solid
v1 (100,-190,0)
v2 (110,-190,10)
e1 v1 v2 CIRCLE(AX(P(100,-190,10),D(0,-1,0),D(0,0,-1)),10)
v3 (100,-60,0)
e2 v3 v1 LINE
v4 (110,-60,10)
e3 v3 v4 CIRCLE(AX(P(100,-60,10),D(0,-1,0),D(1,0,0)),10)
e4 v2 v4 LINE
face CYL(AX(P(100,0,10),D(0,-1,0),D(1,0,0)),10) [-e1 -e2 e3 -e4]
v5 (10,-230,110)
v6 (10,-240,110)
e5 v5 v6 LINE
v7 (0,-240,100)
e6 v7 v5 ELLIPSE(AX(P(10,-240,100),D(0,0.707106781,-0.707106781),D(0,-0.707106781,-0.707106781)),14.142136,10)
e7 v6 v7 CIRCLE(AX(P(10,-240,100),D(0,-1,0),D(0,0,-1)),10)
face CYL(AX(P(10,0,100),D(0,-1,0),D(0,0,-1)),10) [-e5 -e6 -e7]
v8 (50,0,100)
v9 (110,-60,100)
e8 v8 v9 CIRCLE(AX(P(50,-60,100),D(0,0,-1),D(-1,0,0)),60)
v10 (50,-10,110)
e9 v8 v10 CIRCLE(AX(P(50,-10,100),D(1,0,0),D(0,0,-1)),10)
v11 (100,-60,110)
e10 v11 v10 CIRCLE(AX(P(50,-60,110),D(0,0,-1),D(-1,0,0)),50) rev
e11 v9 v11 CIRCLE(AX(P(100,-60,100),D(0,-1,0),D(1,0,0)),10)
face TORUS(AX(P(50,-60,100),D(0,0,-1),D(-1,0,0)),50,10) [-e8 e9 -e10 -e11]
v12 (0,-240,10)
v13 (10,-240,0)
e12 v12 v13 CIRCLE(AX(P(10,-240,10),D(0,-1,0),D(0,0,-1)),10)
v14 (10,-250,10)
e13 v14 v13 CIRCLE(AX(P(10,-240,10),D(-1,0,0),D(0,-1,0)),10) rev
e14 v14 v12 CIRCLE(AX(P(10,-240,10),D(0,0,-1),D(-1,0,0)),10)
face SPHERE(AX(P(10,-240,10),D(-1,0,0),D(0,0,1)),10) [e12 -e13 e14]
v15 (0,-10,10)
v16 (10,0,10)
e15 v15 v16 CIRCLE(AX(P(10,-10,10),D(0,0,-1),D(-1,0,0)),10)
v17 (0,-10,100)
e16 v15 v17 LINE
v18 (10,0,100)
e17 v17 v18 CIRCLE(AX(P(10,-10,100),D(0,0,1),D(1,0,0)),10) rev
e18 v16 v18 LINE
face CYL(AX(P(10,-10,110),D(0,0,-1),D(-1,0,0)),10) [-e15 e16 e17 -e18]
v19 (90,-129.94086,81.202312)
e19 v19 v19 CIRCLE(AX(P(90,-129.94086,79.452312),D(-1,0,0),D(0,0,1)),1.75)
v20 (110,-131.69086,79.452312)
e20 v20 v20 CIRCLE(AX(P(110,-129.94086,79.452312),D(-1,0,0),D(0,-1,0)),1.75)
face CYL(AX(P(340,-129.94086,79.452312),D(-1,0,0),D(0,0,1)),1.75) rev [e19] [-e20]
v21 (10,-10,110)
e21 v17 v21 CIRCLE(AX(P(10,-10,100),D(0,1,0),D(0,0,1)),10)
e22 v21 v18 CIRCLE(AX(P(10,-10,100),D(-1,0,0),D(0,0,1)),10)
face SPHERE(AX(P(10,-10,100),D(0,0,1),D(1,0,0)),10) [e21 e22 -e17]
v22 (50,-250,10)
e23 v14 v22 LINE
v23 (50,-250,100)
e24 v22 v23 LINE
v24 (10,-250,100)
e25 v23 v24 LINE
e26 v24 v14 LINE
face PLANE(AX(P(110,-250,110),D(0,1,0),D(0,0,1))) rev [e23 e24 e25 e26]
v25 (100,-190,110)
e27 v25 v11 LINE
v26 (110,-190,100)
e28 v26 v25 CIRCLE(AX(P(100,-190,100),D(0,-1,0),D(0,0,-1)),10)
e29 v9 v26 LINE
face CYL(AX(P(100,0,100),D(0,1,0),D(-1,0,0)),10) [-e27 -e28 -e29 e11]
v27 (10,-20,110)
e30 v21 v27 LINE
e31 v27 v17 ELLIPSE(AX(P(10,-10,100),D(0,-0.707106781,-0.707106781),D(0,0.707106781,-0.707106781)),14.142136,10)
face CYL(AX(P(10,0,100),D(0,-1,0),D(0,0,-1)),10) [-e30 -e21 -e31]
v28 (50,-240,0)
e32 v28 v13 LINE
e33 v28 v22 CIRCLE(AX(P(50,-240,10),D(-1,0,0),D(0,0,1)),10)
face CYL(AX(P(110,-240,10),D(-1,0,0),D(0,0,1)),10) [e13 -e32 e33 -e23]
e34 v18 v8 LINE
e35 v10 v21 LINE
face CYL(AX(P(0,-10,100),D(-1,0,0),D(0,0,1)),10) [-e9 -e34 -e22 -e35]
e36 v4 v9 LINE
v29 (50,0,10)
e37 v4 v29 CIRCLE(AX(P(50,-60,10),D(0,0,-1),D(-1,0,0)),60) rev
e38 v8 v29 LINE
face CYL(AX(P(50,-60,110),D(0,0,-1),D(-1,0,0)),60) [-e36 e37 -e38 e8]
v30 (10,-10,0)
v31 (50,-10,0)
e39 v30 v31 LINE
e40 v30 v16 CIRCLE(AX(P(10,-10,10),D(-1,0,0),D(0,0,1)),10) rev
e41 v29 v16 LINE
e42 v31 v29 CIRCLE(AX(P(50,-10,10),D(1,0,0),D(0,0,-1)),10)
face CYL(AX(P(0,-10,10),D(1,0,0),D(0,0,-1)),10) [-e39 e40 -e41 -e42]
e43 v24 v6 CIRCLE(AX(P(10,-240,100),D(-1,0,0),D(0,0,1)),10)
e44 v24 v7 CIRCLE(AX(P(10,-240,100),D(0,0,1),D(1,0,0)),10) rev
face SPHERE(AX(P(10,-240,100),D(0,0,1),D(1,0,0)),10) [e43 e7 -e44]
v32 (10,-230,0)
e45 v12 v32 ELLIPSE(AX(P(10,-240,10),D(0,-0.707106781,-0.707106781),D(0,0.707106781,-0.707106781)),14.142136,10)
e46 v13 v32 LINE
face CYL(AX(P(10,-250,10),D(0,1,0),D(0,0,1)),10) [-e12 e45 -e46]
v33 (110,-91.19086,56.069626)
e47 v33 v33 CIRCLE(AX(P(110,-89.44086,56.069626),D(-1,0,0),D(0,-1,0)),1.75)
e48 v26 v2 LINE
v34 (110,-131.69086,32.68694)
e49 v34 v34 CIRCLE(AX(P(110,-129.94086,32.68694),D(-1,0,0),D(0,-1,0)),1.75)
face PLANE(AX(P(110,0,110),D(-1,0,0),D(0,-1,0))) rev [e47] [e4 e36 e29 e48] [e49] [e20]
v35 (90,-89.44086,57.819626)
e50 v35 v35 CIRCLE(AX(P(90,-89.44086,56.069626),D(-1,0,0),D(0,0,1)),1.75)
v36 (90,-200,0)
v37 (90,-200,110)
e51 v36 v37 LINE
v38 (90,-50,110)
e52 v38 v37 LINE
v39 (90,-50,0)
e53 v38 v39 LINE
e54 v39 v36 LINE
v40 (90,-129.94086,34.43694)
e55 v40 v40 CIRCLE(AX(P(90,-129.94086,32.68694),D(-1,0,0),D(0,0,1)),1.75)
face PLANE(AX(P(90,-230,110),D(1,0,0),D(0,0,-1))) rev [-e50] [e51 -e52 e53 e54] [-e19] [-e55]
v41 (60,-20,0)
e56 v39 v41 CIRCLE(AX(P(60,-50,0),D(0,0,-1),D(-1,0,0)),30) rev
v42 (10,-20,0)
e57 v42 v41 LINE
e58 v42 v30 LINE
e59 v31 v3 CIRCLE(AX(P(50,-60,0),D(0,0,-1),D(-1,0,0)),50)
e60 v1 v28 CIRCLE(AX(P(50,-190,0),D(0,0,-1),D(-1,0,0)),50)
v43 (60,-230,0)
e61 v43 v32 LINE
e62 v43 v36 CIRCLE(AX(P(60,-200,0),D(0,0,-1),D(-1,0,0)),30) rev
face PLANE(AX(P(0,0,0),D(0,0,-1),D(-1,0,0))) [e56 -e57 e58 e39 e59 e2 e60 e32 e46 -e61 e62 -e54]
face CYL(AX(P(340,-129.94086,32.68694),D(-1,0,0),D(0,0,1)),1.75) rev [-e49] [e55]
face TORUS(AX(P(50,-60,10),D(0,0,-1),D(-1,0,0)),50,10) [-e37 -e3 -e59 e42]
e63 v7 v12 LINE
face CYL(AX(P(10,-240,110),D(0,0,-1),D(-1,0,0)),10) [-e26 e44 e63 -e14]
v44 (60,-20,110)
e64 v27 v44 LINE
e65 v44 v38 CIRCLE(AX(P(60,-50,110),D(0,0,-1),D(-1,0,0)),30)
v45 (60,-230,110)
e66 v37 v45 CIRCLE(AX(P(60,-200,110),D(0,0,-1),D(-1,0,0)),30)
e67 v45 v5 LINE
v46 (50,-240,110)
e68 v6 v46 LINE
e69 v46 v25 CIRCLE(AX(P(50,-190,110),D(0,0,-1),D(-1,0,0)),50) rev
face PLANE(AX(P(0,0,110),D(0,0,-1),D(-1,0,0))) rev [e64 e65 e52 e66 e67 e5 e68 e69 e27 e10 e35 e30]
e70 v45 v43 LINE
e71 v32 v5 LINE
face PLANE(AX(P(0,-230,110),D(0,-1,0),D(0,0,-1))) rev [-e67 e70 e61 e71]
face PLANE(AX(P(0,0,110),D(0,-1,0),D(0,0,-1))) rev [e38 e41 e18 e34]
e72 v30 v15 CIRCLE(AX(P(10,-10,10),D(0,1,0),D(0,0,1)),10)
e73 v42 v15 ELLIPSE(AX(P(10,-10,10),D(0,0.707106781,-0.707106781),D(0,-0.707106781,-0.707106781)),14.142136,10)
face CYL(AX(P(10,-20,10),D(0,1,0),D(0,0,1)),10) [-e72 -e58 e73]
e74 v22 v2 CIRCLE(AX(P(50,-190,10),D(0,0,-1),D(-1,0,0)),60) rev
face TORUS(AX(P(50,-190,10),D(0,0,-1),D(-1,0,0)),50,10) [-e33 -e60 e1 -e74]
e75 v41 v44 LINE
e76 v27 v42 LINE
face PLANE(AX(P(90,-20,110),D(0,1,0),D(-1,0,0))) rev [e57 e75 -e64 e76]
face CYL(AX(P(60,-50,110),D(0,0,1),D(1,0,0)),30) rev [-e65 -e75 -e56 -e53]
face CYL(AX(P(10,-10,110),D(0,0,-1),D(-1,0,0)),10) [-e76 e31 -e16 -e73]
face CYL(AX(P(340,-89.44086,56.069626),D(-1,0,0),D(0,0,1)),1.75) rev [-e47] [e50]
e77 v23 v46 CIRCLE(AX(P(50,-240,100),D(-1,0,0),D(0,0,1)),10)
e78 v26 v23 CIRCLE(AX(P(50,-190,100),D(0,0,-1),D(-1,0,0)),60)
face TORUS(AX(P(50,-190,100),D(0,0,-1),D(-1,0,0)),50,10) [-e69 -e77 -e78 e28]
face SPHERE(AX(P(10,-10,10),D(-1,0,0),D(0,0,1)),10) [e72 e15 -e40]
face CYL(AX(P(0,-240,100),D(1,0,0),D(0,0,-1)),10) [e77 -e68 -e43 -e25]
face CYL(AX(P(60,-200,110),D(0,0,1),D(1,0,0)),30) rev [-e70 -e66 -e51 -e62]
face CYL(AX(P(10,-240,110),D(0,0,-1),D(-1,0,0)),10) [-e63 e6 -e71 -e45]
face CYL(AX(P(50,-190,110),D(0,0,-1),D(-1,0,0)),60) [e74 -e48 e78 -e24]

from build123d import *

# Parameters (mm, degrees)
BOSS_EXTRUDE1_DEPTH = 110
FILLET1_R           = 60
FILLET3_R           = 30
FILLET4_R           = 10
SKETCH2_R           = 1.75
CUT_EXTRUDE1_DEPTH  = 250


with BuildPart() as part:
    # Sketch1 → Boss-Extrude1 (new body)
    with BuildSketch(Plane.XY):
        Polygon((0, 0), (110, 0), (110, -250), (0, -250), (0, -230), (90, -230), (90, -20), (0, -20), align=None)
    extrude(amount=BOSS_EXTRUDE1_DEPTH)

    # Fillet1
    fillet1_edges = [part.edges().sort_by_distance(p)[0] for p in [
        (110, 0, 55),
        (110, -250, 55),
    ]]
    fillet(fillet1_edges, radius=FILLET1_R)

    # Fillet3
    fillet3_edges = [part.edges().sort_by_distance(p)[0] for p in [
        (90, -230, 55),
        (90, -20, 55),
    ]]
    fillet(fillet3_edges, radius=FILLET3_R)

    # Fillet4
    fillet4_edges = [part.edges().sort_by_distance(p)[0] for p in [
        (0, -10, 0),
        (0, 0, 55),
        (0, -250, 55),
        (0, -230, 55),
        (0, -20, 55),
        (0, -240, 110),
        (25, 0, 0),
        (25, 0, 110),
        (25, -250, 110),
        (110, -125, 0),
        (92.426406871, -232.426406871, 0),
        (92.426406871, -17.573593129, 0),
        (110, -125, 110),
        (92.426406871, -232.426406871, 110),
        (92.426406871, -17.573593129, 110),
        (0, -10, 110),
        (25, -250, 0),
        (0, -240, 0),
    ]]
    fillet(fillet4_edges, radius=FILLET4_R - 0.0001)  # a hair under: the kernel refuses the full size

    # Sketch2 → Cut-Extrude1 (cut)
    with BuildSketch(Plane.ZY.offset(-90)):
        with Locations((56.069625953, -89.440859908)):
            Circle(SKETCH2_R)
        with Locations((79.452311855, -129.940859908)):
            Circle(SKETCH2_R)
        with Locations((32.686940051, -129.940859908)):
            Circle(SKETCH2_R)
    extrude(amount=-CUT_EXTRUDE1_DEPTH, mode=Mode.SUBTRACT)


solid = part.part
